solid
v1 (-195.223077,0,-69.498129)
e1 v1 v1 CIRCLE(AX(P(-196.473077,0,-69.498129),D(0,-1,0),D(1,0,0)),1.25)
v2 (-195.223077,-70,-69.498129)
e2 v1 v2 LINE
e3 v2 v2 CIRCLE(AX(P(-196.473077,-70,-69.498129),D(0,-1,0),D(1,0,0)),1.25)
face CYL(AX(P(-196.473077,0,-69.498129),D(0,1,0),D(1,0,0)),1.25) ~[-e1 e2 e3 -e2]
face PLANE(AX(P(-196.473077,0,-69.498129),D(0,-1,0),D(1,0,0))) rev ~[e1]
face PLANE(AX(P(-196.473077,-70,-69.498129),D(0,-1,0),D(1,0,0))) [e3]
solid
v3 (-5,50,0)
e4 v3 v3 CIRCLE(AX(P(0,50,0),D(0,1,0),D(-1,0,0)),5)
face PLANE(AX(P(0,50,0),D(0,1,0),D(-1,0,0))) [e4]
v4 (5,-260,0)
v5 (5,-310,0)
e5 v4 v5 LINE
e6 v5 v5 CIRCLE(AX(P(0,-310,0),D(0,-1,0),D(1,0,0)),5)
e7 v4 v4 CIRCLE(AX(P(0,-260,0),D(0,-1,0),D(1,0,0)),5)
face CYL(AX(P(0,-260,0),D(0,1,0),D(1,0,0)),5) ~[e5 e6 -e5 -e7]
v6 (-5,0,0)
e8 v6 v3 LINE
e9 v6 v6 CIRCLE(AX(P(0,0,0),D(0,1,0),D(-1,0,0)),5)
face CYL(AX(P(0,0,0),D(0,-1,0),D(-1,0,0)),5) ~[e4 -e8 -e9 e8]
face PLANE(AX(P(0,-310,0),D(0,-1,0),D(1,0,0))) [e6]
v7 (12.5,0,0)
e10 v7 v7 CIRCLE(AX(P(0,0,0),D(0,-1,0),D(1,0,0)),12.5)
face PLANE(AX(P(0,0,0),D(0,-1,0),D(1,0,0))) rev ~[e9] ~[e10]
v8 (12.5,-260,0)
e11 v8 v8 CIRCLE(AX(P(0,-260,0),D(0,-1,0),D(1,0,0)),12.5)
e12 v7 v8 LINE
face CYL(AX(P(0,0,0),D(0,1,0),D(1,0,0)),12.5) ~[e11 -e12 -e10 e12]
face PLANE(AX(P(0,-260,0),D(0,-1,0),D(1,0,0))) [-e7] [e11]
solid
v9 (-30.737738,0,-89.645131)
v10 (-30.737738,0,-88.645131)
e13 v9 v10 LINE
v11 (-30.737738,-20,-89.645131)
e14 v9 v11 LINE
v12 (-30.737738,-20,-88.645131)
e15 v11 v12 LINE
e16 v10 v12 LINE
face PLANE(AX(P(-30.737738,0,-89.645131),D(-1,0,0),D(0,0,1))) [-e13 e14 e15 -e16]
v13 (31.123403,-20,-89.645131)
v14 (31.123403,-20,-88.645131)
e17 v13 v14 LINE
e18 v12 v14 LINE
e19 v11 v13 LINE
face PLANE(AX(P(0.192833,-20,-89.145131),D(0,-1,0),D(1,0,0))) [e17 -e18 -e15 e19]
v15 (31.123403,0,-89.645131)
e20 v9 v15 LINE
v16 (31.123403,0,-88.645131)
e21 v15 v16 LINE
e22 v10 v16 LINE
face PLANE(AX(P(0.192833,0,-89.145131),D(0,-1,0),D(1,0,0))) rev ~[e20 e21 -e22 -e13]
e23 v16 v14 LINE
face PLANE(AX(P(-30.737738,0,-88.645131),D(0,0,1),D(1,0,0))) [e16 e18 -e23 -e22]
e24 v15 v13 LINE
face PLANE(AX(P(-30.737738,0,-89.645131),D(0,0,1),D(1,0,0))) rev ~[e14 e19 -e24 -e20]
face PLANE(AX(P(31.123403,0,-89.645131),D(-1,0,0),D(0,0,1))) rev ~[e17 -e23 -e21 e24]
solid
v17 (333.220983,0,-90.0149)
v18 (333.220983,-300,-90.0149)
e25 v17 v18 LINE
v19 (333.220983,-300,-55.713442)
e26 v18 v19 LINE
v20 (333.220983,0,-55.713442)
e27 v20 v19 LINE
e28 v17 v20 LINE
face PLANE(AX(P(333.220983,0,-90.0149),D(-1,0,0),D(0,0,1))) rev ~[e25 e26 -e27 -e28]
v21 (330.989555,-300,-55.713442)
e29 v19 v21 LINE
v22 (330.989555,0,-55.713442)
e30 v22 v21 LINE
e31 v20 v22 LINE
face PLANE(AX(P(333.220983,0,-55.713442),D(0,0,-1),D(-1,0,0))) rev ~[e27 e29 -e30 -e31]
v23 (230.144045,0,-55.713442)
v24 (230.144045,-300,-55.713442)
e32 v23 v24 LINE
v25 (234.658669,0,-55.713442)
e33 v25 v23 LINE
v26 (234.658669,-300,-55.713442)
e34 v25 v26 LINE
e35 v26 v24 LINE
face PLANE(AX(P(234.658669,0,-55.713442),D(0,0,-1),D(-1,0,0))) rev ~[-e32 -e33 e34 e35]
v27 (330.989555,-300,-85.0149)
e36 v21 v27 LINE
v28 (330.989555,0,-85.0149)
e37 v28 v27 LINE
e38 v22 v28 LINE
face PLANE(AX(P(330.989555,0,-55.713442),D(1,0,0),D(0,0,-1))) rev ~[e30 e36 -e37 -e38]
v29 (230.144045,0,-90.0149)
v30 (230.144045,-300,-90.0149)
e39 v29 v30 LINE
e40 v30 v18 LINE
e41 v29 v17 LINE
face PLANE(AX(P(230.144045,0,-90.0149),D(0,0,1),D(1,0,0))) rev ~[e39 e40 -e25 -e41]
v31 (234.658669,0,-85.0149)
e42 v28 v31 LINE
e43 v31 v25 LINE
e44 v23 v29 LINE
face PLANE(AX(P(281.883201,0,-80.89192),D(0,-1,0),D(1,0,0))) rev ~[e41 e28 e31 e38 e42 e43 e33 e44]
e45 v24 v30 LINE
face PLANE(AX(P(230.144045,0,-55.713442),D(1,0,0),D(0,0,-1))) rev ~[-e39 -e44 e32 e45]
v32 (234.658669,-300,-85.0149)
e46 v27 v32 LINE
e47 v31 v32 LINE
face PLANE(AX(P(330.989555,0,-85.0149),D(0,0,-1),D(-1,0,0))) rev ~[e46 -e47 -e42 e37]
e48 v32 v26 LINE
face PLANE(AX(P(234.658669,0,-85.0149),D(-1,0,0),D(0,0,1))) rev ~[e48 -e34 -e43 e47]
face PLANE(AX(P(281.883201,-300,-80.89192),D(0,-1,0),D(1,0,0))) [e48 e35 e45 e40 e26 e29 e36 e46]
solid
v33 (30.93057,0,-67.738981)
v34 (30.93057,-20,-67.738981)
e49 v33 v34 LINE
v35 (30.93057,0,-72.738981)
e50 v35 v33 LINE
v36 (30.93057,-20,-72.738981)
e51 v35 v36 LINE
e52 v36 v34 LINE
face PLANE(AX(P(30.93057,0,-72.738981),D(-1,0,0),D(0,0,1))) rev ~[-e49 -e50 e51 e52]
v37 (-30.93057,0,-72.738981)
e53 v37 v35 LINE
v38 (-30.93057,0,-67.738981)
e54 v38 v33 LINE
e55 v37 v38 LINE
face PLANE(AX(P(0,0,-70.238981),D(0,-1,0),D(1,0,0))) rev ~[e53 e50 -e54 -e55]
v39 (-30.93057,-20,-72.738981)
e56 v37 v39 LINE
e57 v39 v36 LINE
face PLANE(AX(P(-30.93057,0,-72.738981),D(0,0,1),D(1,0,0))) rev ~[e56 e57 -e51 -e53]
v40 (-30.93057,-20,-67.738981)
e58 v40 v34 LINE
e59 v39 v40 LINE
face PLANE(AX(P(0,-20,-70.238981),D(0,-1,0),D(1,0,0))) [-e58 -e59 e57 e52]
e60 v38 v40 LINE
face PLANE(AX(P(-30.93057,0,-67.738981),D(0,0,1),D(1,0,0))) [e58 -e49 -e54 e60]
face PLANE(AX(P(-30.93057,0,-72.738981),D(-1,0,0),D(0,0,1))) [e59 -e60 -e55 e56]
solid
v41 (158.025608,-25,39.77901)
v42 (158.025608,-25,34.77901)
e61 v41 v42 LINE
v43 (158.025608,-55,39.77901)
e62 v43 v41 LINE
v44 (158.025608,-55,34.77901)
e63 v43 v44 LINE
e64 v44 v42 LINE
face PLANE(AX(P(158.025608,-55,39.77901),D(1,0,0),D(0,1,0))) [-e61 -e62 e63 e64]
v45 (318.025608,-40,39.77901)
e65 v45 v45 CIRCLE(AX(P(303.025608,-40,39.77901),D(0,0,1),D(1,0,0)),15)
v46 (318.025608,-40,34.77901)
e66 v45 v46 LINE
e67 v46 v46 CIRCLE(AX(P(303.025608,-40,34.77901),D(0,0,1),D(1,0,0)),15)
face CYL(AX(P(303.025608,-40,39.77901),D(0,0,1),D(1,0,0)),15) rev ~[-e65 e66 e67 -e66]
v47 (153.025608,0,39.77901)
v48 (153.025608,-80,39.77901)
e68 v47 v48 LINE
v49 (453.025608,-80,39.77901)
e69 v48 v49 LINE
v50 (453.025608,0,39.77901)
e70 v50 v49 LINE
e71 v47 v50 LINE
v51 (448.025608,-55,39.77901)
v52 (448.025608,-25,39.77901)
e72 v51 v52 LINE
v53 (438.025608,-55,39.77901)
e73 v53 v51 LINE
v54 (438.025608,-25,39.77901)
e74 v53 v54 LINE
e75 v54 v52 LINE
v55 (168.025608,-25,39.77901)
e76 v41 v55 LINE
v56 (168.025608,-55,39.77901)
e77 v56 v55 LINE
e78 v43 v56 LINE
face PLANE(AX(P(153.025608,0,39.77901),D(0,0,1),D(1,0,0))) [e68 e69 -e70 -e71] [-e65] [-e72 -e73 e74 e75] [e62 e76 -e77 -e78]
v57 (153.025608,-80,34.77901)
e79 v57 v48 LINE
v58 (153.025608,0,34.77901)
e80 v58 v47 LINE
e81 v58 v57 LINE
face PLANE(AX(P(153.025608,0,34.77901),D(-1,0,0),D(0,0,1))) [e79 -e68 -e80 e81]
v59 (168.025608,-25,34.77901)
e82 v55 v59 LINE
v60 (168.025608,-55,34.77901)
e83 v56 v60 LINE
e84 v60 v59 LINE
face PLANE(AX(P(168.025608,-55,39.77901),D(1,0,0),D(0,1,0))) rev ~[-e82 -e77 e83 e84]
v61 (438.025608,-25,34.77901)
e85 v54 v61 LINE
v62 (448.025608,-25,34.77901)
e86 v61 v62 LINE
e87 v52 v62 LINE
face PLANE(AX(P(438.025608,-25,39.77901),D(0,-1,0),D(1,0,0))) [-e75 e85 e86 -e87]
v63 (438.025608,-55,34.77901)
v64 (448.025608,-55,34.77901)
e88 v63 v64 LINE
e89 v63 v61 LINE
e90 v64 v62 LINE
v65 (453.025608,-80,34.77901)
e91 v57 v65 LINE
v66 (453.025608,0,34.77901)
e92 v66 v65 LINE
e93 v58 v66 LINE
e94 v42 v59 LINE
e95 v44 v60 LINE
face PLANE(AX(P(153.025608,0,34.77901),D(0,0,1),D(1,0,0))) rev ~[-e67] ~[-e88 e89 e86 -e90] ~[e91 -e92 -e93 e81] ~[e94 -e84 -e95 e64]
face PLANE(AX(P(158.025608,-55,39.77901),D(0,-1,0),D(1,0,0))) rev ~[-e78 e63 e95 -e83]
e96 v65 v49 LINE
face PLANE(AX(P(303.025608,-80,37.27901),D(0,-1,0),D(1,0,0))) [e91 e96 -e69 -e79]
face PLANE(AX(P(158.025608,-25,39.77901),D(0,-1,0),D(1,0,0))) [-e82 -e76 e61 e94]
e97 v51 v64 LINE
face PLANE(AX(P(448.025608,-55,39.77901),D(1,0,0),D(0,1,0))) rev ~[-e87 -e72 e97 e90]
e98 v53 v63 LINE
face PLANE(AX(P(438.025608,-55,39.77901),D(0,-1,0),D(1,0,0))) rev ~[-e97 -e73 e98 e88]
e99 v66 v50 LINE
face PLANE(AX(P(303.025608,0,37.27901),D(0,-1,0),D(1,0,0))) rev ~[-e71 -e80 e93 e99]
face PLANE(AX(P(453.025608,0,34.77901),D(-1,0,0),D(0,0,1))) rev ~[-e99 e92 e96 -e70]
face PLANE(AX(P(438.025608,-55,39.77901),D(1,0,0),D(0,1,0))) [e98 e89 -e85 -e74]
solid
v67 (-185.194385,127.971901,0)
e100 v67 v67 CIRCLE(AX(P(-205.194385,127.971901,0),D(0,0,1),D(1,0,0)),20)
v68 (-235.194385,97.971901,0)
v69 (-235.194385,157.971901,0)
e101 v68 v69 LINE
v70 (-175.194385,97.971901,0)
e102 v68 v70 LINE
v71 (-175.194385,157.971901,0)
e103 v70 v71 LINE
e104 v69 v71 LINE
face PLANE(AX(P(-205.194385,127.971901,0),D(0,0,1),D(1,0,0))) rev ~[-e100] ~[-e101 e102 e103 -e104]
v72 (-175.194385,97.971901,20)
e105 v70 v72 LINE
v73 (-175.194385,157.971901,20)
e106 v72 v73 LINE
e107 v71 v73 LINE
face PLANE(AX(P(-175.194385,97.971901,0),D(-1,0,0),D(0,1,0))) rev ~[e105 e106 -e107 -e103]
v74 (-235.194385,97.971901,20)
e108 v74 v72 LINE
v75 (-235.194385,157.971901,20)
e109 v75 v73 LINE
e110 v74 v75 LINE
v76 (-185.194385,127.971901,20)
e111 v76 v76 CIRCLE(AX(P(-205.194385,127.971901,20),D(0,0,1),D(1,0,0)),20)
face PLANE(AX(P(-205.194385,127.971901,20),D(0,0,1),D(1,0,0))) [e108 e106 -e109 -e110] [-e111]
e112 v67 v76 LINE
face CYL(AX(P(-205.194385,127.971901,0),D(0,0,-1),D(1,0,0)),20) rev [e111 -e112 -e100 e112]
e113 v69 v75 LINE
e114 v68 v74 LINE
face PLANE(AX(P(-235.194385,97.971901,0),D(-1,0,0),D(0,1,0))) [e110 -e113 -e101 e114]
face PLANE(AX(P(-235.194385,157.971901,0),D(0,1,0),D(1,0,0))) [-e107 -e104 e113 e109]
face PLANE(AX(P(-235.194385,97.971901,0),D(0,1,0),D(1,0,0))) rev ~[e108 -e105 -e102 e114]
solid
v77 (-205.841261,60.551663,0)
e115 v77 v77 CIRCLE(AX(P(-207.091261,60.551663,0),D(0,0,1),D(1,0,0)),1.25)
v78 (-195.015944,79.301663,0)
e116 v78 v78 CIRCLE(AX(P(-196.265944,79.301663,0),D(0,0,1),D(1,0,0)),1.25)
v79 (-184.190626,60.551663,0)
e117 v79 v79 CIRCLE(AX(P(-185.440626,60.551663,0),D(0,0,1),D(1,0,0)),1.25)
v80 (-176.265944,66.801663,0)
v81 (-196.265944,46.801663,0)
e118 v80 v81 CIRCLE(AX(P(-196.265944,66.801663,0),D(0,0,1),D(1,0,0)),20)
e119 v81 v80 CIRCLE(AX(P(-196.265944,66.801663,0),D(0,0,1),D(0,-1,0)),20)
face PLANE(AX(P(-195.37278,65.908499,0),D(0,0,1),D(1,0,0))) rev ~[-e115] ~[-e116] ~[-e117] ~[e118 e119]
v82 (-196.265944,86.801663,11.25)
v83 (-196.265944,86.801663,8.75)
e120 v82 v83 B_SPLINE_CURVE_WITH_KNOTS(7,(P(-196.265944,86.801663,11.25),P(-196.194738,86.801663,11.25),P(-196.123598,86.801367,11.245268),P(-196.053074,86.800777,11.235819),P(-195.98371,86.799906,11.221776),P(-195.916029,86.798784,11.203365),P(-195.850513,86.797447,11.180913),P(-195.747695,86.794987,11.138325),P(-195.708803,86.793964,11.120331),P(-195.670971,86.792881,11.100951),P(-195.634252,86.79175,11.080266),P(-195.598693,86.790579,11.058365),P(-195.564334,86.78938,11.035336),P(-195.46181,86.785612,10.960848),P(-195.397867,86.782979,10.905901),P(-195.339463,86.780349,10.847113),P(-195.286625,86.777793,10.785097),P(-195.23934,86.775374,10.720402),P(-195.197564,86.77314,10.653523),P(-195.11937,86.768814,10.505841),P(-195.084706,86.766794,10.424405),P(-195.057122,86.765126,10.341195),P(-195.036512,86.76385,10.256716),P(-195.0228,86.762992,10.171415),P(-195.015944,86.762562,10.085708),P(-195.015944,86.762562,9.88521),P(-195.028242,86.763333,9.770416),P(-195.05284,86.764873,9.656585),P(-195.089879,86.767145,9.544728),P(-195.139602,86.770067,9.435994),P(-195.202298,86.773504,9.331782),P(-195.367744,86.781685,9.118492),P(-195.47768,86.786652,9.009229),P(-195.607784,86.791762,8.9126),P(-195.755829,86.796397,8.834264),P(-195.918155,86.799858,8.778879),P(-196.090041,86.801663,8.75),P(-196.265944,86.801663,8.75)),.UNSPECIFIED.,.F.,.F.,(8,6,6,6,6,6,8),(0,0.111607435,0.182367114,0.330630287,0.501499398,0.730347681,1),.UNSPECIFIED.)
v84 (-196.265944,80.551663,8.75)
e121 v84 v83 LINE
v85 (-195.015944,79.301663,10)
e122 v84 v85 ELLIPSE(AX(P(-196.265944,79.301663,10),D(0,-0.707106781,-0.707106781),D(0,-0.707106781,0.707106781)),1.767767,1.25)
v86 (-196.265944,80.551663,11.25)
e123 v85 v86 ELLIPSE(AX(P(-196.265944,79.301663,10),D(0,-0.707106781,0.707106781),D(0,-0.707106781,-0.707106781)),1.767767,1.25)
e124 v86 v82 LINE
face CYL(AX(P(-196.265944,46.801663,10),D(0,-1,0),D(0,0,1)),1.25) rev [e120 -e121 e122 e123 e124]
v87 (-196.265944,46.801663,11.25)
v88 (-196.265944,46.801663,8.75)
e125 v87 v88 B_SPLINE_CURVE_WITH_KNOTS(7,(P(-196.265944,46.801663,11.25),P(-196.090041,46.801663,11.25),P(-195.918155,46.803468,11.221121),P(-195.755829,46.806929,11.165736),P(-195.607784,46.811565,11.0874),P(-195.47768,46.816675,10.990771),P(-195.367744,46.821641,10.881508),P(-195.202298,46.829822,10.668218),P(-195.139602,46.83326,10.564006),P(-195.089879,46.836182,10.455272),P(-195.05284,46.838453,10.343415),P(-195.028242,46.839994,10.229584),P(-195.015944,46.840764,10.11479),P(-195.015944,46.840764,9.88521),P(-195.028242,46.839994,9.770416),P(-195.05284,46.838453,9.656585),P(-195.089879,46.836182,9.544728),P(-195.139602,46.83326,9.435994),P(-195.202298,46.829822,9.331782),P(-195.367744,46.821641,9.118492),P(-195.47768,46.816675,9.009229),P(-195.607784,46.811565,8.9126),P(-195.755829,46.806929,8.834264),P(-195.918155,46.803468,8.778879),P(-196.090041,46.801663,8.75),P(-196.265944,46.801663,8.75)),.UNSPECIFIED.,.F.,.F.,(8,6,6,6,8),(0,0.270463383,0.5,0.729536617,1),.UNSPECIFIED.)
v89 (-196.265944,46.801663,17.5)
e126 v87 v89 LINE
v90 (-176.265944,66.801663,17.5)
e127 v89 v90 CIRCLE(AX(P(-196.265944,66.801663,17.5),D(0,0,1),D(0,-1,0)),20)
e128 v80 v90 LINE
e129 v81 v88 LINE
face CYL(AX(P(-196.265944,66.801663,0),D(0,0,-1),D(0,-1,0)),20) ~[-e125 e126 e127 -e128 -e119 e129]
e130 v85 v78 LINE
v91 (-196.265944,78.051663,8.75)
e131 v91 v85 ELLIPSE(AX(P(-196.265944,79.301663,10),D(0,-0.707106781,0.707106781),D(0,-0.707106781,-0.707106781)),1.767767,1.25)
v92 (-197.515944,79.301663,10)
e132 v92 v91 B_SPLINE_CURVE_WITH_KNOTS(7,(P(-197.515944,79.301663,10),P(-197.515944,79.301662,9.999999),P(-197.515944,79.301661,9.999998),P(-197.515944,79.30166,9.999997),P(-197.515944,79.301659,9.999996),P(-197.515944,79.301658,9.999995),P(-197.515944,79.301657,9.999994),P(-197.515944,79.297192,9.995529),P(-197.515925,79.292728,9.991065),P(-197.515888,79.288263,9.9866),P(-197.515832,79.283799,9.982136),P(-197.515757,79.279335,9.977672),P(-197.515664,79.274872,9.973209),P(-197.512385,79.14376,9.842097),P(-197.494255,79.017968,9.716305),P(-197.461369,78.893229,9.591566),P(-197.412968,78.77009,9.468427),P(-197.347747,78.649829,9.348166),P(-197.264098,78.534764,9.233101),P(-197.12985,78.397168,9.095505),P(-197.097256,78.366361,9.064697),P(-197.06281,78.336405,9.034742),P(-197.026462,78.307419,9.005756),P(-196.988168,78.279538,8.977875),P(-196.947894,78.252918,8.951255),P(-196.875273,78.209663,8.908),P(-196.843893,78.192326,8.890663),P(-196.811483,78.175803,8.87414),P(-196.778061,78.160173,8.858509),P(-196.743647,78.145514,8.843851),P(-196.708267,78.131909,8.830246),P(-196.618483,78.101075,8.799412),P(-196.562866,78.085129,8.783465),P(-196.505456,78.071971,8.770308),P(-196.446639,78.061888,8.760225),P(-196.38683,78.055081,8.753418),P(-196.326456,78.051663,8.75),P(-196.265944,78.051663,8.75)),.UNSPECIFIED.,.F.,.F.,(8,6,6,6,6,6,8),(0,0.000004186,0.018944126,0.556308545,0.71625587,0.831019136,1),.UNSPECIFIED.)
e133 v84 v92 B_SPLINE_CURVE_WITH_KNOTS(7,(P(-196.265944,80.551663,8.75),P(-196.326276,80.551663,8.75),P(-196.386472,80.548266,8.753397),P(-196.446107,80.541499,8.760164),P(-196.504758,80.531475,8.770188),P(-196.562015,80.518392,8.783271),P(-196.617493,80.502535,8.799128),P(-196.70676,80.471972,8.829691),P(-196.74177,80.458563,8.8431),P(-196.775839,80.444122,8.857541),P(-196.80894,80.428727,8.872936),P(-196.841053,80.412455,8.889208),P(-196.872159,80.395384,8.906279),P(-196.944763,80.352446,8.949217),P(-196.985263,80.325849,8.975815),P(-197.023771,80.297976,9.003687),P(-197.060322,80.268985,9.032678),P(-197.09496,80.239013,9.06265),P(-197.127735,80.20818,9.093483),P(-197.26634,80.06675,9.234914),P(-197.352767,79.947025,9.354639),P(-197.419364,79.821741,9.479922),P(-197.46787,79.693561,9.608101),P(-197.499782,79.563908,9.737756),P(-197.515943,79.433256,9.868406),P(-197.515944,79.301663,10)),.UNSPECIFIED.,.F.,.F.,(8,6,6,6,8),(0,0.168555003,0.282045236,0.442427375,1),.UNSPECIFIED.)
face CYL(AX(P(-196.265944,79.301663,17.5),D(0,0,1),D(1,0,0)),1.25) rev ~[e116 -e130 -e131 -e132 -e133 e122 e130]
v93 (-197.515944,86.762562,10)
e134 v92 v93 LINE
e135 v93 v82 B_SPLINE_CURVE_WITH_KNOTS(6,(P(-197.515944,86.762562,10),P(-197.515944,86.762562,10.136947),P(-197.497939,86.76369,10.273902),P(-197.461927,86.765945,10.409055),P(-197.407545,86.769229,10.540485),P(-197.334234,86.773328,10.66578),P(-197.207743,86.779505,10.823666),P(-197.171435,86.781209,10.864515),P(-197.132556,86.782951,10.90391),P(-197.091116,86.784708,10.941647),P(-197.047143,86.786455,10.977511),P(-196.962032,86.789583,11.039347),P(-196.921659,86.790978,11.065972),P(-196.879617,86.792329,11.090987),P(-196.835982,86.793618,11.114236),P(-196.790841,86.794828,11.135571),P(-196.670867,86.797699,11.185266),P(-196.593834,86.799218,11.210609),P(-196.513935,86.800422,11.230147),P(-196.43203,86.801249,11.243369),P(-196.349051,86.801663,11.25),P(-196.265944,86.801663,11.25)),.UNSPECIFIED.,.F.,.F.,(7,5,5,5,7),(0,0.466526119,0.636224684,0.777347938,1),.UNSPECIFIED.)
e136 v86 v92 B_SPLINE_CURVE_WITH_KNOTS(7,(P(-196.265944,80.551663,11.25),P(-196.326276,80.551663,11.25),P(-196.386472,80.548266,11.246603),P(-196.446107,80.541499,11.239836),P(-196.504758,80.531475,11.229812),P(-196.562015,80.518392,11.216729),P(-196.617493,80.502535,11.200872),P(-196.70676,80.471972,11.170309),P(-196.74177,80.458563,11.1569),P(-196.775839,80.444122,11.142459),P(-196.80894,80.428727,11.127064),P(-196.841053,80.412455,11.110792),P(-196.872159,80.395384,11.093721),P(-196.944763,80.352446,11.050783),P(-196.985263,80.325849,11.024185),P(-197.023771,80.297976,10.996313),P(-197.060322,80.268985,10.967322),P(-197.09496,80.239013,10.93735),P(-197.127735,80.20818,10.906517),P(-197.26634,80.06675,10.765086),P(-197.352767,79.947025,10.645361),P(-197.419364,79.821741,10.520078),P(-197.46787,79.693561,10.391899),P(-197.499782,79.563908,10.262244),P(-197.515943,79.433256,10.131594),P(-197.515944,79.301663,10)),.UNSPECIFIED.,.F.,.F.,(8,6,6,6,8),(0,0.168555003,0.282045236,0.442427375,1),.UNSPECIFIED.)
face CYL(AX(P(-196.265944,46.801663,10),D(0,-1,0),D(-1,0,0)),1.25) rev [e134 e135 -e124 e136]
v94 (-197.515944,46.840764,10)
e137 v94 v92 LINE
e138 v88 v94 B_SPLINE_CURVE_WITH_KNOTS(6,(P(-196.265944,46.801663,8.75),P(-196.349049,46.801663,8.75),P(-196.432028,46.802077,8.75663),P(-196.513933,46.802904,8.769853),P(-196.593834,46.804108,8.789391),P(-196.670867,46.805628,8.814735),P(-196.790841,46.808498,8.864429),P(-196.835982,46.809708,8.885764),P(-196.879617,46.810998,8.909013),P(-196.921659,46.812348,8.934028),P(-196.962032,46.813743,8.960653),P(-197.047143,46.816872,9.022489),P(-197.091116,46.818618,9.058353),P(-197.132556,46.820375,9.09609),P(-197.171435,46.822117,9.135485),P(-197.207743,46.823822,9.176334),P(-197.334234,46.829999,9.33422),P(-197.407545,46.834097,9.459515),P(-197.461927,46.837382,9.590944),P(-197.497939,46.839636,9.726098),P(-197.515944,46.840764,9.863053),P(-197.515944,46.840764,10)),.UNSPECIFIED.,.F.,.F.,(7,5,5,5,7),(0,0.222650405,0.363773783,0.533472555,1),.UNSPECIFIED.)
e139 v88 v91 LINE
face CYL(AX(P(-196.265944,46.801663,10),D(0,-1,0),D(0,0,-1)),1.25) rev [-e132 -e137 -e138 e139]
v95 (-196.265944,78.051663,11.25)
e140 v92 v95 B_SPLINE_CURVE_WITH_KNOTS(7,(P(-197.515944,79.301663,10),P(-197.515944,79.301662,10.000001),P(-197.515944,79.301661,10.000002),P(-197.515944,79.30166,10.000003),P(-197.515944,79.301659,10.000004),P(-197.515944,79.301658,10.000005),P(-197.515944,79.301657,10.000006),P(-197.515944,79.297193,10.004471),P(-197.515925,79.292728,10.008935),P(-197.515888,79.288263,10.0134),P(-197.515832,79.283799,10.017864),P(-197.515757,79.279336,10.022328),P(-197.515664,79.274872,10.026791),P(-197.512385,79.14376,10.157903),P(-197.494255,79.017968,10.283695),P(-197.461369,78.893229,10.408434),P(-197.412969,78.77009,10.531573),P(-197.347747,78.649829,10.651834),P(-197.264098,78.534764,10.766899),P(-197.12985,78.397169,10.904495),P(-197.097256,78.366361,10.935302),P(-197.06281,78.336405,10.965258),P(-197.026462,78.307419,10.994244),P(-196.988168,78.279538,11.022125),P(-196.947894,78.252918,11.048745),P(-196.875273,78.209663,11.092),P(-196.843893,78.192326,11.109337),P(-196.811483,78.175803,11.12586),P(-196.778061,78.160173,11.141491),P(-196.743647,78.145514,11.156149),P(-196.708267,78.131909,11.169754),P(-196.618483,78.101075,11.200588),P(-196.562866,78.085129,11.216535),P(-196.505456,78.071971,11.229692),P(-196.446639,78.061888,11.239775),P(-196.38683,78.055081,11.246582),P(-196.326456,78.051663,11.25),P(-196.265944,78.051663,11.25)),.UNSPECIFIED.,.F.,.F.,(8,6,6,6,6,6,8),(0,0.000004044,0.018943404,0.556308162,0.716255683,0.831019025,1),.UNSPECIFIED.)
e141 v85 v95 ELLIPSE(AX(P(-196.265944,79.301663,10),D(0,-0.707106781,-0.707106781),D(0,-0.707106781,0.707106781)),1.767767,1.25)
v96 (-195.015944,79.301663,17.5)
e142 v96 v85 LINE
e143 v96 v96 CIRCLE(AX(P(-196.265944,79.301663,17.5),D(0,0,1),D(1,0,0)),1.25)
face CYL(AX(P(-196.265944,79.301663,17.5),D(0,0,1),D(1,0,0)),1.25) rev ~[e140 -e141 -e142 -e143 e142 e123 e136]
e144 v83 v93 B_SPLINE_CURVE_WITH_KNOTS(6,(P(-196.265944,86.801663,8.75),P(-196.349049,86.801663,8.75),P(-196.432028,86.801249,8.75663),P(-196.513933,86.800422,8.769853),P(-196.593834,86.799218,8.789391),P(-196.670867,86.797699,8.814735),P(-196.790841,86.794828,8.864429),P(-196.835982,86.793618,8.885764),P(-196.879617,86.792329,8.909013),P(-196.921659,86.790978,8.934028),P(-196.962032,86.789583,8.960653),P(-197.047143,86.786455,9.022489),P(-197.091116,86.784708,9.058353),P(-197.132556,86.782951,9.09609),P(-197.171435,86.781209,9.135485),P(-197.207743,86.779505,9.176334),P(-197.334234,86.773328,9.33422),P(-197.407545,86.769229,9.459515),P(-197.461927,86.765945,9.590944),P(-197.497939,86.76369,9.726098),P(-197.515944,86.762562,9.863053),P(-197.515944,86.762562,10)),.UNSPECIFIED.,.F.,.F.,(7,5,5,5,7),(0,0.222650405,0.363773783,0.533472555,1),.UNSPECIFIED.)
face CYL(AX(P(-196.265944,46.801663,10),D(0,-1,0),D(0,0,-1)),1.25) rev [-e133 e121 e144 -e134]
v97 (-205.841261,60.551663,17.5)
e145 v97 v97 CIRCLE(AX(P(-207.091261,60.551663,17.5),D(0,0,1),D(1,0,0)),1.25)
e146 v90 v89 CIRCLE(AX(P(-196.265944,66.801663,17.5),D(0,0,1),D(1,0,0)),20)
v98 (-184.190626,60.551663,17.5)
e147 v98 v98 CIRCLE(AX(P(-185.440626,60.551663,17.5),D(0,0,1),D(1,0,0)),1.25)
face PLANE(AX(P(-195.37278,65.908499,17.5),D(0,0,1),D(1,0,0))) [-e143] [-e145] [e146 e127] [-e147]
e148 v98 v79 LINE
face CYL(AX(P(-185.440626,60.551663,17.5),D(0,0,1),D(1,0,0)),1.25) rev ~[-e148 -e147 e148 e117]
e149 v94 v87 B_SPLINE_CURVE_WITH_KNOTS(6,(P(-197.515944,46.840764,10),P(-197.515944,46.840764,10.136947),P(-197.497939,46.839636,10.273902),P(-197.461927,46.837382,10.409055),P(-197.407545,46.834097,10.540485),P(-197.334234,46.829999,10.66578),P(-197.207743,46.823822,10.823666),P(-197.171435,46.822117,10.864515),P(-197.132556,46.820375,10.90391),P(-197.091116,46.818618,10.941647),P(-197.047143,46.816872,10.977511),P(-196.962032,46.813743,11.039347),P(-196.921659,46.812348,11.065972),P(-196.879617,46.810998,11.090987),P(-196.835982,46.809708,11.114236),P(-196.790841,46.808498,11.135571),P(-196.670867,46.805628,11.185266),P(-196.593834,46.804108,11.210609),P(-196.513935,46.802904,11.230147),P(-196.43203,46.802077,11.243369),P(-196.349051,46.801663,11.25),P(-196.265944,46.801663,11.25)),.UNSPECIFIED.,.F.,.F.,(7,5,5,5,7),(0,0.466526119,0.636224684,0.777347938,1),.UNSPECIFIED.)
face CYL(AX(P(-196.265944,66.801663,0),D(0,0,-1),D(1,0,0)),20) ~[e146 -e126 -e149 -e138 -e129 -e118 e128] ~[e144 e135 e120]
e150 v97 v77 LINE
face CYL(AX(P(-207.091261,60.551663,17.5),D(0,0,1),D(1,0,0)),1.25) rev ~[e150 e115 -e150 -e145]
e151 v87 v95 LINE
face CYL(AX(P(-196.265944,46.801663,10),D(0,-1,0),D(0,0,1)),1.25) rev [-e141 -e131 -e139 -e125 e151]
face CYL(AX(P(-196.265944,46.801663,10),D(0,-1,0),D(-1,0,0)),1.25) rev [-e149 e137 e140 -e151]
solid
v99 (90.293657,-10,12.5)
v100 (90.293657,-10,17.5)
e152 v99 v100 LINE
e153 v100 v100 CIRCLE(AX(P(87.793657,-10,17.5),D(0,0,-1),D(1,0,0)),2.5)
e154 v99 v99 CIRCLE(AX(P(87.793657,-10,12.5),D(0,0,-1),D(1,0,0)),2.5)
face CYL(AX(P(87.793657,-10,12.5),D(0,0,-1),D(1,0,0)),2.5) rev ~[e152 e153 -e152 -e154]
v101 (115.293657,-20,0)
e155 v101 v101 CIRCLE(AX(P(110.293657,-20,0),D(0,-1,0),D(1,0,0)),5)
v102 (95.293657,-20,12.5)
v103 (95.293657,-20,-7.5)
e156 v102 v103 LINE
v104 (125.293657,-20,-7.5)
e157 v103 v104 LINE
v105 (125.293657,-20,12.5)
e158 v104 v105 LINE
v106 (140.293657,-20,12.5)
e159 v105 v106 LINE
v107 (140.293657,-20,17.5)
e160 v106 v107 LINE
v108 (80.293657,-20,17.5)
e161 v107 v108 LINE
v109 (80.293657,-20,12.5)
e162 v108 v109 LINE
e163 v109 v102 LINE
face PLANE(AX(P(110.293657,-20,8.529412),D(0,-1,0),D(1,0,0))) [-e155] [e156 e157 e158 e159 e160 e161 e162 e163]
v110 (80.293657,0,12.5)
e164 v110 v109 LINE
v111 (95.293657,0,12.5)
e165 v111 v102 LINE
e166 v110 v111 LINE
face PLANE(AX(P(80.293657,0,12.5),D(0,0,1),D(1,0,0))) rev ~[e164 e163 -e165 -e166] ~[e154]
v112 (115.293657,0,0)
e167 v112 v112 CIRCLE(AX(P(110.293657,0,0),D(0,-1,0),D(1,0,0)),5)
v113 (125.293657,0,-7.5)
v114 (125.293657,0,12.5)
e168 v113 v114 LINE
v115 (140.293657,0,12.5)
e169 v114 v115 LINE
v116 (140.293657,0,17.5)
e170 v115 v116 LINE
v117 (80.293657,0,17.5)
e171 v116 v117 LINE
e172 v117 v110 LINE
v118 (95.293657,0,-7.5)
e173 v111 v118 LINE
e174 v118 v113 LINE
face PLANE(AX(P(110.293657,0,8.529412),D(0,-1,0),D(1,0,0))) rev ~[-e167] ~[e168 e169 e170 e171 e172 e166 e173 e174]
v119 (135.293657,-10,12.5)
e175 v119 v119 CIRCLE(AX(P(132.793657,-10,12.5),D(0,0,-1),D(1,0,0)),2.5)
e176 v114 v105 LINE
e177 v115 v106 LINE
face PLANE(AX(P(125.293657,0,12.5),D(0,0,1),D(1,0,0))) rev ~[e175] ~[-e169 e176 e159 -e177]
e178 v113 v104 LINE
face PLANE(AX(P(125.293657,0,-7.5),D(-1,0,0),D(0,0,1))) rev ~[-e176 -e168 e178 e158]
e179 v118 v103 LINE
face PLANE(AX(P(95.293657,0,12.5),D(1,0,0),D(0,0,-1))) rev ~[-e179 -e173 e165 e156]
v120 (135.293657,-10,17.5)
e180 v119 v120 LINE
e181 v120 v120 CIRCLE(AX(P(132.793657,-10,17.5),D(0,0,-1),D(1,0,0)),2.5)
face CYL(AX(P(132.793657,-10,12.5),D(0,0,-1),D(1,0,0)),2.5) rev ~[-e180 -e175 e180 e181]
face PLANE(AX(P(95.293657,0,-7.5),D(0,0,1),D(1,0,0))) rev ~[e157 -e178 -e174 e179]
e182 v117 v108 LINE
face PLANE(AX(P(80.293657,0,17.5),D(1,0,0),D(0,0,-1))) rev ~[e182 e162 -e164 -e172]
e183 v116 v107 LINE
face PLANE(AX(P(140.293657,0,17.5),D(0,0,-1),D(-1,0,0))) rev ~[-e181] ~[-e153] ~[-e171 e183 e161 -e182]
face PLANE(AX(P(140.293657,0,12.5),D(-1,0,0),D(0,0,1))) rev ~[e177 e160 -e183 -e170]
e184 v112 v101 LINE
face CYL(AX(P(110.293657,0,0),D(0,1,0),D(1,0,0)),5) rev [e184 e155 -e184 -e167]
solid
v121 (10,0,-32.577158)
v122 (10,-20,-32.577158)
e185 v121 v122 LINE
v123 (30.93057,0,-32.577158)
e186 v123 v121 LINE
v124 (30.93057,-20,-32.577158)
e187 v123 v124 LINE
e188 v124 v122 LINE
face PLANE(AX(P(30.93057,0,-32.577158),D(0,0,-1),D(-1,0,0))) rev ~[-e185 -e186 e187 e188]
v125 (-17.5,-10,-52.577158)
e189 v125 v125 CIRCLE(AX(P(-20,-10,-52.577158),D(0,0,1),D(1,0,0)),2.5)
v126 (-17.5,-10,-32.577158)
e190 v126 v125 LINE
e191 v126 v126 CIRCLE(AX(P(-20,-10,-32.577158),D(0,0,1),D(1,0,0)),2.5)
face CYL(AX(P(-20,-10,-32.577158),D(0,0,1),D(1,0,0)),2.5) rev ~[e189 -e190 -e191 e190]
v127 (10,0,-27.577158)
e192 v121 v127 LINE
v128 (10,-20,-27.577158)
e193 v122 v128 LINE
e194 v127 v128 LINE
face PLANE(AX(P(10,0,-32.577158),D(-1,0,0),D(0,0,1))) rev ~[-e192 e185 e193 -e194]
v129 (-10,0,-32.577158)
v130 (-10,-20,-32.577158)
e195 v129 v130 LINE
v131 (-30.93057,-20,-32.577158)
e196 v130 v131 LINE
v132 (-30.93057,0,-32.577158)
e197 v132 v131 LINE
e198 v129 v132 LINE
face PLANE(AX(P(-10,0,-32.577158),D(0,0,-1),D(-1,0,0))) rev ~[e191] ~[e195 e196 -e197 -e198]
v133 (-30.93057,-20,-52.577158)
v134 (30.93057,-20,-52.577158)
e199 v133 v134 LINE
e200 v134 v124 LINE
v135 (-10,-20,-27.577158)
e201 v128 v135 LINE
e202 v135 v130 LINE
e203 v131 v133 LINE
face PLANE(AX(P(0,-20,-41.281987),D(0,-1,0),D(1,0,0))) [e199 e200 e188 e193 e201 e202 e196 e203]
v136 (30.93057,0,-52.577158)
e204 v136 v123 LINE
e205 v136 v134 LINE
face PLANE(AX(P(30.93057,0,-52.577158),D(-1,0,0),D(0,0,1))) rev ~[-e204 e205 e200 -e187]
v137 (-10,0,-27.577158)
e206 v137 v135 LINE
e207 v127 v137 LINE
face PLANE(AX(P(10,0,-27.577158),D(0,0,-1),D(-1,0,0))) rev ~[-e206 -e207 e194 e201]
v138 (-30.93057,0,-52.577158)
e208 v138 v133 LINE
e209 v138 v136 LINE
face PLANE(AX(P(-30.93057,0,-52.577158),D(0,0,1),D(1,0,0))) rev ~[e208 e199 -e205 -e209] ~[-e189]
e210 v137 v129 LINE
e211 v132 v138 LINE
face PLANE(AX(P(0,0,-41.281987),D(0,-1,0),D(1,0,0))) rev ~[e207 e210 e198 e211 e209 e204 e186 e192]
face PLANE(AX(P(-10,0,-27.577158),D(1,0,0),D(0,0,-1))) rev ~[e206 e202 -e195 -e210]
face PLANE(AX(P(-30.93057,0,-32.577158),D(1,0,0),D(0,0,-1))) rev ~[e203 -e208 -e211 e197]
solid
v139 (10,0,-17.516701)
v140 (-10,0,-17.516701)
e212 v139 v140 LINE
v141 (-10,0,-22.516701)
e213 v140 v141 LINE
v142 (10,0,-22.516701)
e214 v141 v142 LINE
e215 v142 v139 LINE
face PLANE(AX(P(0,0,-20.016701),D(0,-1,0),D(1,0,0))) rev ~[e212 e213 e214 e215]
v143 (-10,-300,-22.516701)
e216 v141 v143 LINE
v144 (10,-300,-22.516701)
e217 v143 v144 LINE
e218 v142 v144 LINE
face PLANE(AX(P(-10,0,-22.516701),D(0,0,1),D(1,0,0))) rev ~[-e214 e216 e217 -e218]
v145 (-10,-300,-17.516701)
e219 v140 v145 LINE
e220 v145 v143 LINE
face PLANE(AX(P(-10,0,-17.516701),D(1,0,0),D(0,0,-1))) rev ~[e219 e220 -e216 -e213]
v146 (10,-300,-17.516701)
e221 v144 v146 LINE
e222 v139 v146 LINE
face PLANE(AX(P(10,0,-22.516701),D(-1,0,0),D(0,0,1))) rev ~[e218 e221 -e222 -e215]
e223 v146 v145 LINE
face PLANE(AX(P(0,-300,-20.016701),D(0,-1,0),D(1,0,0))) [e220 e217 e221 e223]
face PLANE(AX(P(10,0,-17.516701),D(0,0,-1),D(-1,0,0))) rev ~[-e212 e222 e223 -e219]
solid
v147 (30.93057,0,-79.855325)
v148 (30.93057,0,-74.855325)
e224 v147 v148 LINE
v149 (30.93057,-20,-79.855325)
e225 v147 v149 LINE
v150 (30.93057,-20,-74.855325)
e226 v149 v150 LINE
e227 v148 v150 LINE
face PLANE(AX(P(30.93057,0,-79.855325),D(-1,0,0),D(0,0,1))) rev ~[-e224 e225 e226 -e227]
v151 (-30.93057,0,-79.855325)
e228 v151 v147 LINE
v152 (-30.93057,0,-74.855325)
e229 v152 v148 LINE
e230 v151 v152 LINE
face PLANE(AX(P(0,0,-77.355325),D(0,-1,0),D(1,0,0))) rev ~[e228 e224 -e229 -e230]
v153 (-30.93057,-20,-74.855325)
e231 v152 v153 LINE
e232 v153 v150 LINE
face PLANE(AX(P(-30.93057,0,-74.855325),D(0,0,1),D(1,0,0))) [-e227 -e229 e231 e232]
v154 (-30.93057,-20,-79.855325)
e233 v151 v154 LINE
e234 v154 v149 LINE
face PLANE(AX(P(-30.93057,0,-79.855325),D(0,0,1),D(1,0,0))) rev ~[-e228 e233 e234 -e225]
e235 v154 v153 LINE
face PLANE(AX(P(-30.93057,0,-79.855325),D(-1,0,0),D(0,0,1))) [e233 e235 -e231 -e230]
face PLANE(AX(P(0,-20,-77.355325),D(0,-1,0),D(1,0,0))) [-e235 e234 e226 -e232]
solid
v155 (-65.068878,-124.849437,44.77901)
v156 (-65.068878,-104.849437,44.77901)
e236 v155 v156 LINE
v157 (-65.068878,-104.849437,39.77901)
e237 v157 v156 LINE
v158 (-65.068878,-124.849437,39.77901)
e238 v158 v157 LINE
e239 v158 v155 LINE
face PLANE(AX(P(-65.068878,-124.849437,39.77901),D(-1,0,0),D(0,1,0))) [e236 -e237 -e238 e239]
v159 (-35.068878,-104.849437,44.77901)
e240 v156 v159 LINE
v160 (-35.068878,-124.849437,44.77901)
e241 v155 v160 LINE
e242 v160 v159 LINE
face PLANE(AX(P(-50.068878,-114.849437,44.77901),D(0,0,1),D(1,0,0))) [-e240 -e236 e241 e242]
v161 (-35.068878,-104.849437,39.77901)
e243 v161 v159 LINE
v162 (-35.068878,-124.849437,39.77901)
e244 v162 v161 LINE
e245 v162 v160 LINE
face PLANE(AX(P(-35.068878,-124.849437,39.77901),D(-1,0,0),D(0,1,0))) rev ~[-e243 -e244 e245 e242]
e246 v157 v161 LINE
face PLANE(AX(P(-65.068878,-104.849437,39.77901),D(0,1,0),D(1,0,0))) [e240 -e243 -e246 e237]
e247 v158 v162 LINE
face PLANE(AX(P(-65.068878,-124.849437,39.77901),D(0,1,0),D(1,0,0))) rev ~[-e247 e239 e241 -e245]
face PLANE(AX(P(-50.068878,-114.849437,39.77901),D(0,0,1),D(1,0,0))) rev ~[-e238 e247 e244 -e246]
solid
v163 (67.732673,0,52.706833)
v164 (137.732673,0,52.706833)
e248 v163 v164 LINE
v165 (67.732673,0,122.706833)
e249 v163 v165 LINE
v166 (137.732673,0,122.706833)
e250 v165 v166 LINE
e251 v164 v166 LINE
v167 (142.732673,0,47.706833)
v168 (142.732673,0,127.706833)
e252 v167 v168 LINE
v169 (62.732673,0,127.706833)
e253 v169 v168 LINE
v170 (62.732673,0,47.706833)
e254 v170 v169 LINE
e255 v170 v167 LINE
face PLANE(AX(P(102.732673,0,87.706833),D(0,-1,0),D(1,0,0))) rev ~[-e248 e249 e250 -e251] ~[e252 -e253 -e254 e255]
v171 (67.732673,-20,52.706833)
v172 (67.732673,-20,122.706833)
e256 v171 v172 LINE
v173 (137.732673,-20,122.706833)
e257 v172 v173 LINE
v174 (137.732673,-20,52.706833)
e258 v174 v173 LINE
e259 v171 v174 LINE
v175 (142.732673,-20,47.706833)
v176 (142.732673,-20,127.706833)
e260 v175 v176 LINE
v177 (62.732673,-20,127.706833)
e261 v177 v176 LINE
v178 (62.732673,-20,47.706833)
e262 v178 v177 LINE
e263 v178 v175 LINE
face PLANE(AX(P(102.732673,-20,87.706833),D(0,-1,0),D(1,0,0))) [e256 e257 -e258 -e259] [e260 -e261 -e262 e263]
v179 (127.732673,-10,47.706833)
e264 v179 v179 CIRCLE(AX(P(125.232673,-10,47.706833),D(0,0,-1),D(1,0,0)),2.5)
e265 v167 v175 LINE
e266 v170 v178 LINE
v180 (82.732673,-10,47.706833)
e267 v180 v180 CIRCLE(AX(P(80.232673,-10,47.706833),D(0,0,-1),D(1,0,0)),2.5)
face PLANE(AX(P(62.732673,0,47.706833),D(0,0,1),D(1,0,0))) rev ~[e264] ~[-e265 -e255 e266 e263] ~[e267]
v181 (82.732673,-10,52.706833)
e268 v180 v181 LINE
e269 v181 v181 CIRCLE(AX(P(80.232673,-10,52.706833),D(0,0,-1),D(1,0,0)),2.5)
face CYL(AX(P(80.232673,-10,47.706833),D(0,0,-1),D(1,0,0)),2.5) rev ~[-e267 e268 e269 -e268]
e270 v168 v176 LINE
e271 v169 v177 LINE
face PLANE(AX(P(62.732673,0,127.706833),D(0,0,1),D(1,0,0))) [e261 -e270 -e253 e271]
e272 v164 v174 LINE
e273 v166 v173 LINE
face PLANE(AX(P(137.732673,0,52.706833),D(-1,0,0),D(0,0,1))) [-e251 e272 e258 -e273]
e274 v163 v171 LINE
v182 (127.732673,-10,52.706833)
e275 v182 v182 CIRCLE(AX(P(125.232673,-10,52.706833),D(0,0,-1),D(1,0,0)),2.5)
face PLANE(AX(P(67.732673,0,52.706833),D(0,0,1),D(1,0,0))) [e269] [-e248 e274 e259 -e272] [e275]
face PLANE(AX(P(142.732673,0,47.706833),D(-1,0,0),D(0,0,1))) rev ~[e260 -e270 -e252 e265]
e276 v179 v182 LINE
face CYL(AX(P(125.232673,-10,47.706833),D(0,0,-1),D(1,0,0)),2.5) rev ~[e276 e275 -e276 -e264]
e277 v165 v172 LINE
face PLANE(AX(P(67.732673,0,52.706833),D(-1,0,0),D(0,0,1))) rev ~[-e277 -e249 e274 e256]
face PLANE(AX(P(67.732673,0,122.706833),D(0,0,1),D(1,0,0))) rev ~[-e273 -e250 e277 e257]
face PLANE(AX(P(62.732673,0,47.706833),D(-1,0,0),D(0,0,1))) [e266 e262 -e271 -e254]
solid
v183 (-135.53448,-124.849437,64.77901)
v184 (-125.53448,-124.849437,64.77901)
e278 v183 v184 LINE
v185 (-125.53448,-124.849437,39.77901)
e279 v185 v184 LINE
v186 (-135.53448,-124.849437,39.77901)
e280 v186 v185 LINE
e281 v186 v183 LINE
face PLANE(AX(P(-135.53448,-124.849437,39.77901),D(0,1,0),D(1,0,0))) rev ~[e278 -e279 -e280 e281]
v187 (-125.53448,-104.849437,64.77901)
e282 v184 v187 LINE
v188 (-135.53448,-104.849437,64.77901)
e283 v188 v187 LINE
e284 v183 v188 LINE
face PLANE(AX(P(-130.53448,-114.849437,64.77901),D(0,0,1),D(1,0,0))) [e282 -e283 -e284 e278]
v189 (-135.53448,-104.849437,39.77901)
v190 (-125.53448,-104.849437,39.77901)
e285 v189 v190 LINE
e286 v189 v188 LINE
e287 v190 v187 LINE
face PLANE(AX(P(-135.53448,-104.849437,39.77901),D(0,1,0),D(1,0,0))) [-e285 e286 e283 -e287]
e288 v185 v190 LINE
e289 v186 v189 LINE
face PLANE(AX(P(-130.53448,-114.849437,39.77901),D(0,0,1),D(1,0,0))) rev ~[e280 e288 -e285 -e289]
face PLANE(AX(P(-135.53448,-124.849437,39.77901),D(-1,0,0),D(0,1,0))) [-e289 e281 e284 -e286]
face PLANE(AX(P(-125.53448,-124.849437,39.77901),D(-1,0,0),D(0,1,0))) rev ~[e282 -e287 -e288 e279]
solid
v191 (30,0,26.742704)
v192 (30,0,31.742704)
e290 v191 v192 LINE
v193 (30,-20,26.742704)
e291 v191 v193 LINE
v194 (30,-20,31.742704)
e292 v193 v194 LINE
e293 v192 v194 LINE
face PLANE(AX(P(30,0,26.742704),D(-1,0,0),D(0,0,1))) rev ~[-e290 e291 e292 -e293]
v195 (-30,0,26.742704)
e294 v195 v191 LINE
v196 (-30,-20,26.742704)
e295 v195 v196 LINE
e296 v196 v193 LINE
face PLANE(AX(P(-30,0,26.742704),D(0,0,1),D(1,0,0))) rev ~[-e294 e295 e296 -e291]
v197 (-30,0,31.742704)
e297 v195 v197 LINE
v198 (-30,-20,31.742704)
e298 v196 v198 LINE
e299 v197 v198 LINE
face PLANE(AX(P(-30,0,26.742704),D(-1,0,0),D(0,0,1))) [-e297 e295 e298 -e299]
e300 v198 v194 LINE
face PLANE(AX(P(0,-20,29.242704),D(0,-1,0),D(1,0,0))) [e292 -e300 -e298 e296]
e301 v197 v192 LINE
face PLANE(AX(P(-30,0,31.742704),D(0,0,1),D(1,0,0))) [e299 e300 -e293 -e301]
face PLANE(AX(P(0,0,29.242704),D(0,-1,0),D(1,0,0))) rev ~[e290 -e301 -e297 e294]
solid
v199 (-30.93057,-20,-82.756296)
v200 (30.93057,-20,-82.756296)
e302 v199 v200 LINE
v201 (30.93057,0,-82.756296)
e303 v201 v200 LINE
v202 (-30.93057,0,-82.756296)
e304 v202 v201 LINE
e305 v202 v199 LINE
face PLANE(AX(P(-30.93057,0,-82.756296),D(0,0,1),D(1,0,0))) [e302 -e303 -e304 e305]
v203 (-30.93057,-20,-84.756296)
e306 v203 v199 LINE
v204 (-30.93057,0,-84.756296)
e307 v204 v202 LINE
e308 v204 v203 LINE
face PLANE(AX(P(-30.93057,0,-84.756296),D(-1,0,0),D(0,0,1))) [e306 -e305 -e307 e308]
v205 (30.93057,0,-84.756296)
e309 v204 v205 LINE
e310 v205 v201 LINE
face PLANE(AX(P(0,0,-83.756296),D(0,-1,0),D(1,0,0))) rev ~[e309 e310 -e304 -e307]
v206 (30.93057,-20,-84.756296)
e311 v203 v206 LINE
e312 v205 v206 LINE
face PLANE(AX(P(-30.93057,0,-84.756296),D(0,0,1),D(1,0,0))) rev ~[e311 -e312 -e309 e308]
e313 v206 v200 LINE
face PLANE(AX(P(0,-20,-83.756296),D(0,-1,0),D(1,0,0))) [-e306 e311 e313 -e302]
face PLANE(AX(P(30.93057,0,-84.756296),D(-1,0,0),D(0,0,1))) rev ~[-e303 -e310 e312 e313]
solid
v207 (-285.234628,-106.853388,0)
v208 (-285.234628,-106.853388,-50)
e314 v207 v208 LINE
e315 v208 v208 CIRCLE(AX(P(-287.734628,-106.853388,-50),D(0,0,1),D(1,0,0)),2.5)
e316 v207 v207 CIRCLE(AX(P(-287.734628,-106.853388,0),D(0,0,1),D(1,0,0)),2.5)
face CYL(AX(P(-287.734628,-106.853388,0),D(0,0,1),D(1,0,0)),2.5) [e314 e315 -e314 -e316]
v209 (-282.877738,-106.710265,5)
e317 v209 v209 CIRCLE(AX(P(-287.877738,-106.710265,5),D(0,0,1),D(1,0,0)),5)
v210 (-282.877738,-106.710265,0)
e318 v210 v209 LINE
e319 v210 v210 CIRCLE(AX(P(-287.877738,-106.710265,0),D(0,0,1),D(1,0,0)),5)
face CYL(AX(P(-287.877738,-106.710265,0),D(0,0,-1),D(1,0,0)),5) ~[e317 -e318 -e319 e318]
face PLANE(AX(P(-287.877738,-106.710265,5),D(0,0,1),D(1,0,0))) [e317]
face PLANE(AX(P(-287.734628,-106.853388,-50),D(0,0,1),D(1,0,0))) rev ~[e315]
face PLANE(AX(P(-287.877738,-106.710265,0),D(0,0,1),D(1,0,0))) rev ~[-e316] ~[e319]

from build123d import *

# Parameters (mm, degrees)
F0_R      = 5
F1_DEPTH  = 20
F0_W      = 60
F0_H      = 5
F0_W_2    = 80
F0_H_2    = 80
F0_W_3    = 70
F0_H_3    = 70
F0_W_4    = 61.861140081
F0_H_4    = 1
F0_H_5    = 2
F0_R_2    = 12.5
F2_DEPTH  = 260
F3_R      = 5
F4_DEPTH  = 50
F5_DEPTH  = 300
F6_R      = 2.5
F7_DEPTH  = 25
F9_R      = 2.5
F8_R      = 2.5
F10_DEPTH = 25
F14_R     = 5
F15_DEPTH = 50
F16_W     = 300
F16_H     = 5
F17_DEPTH = 80
F20_DEPTH = 17.5
F19_W     = 60
F19_H     = 60
F19_R     = 20
F21_DEPTH = 20
F18_W     = 10
F18_H     = 30
F18_R     = 15
F22_DEPTH = 129.4251411048
F18_H_2   = 20
F23_DEPTH = 25
F18_W_2   = 30
F24_DEPTH = 5
F13_R     = 2.5
F25_DEPTH = 5
F26_R     = 5
F27_DEPTH = 5
F28_R     = 2.5
F29_DEPTH = 50
F32_DEPTH = 111.1712381574
F33_R     = 1.25
F34_DEPTH = 70
F35_R     = 1.25
F36_DEPTH = 107.1461310813
F38_DEPTH = 300


# Not quite as in the source:
# - a feature of the source that left no trace in its solid (it failed there, or was rolled back) is left out
# - a feature names something its author has since deleted; it is built from what else it names


with BuildPart() as f1:
    # F0 (on Front) → F1 (new body)
    with BuildSketch(Plane.XZ):
        Polygon((95.2936565876, -7.5), (110.2936565876, -7.5), (125.2936565876, -7.5), (125.2936565876, 12.5), (140.2936565876, 12.5), (140.2936565876, 17.5), (110.2936565876, 17.5), (80.2936565876, 17.5), (80.2936565876, 12.5), (95.2936565876, 12.5), align=None)
        with Locations((110.2936565876, 0)):
            Circle(F0_R, mode=Mode.SUBTRACT)
    extrude(amount=F1_DEPTH)

    # F9 (on face) + F8 (on face) → F10 (cut)
    with BuildSketch(Plane(origin=(0, 0, 12.5), x_dir=(1, 0, 0), z_dir=(0, 0, -1))):
        with Locations((87.7936565876, 10)):
            Circle(F9_R)
    with BuildSketch(Plane(origin=(0, 0, 12.5), x_dir=(1, 0, 0), z_dir=(0, 0, -1))):
        with Locations((132.7936565876, 10)):
            Circle(F8_R)
    extrude(amount=-F10_DEPTH, mode=Mode.SUBTRACT)


with BuildPart() as f1b:
    # F0 (on Front) → F1, piece 2 (new body)
    with BuildSketch(Plane.XZ):
        with Locations((0, 29.2427036911)):
            Rectangle(F0_W, F0_H)
    extrude(amount=F1_DEPTH)


with BuildPart() as f1c:
    # F0 (on Front) → F1, piece 3 (new body)
    with BuildSketch(Plane.XZ):
        Polygon((10, -27.5771580637), (0, -27.5771580637), (-10, -27.5771580637), (-10, -32.5771580637), (-10.9305700405, -32.5771580637), (-30.9305700405, -32.5771580637), (-30.9305700405, -52.5771580637), (0, -52.5771580637), (30.9305700405, -52.5771580637), (30.9305700405, -32.5771580637), (10.9305700405, -32.5771580637), (10, -32.5771580637), align=None)
    extrude(amount=F1_DEPTH)

    # F6 (on face) → F7 (cut)
    with BuildSketch(Plane.XY.offset(-32.5771580637)):
        with Locations((-20, -10)):
            Circle(F6_R)
    extrude(amount=-F7_DEPTH, mode=Mode.SUBTRACT)


with BuildPart() as f1d:
    # F0 (on Front) → F1, piece 4 (new body)
    with BuildSketch(Plane.XZ):
        with Locations((102.7326732874, 87.7068325877)):
            Rectangle(F0_W_2, F0_H_2)
        with Locations((102.7326732874, 87.7068325877)):
            Rectangle(F0_W_3, F0_H_3, mode=Mode.SUBTRACT)
    extrude(amount=F1_DEPTH)

    # F13 (on face) → F25 (cut, through all)
    with BuildSketch(Plane(origin=(0, 0, 47.7068325877), x_dir=(1, 0, 0), z_dir=(0, 0, -1))):
        with Locations((125.2326732874, 10)):
            Circle(F13_R)
        with Locations((80.2326732874, 10)):
            Circle(F13_R)
    extrude(amount=-F25_DEPTH, mode=Mode.SUBTRACT)


with BuildPart() as f1e:
    # F0 (on Front) → F1, piece 5 (new body)
    with BuildSketch(Plane.XZ):
        with Locations((0, -77.355325222)):
            Rectangle(F0_W_4, F0_H)
    extrude(amount=F1_DEPTH)


with BuildPart() as f1f:
    # F0 (on Front) → F1, piece 6 (new body)
    with BuildSketch(Plane.XZ):
        with Locations((0.1928325291, -89.1451310813)):
            Rectangle(F0_W_4, F0_H_4)
    extrude(amount=F1_DEPTH)


with BuildPart() as f1g:
    # F0 (on Front) → F1, piece 7 (new body)
    with BuildSketch(Plane.XZ):
        with Locations((0, -83.756296128)):
            Rectangle(F0_W_4, F0_H_5)
    extrude(amount=F1_DEPTH)


with BuildPart() as f1h:
    # F0 (on Front) → F1, piece 8 (new body)
    with BuildSketch(Plane.XZ):
        with Locations((0, -70.2389810979)):
            Rectangle(F0_W_4, F0_H)
    extrude(amount=F1_DEPTH)


with BuildPart() as f2:
    # F0 (on Front) → F2 (new body)
    with BuildSketch(Plane.XZ):
        Circle(F0_R_2)
    extrude(amount=F2_DEPTH)

    # F3 (on face) → F4 (join)
    with BuildSketch(Plane.XZ.offset(260)):
        Circle(F3_R)
    extrude(amount=F4_DEPTH)

    # F14 (on face) → F15 (join)
    with BuildSketch(Plane(origin=(0, 0, 0), x_dir=(-1, 0, 0), z_dir=(0, 1, 0))):
        Circle(F14_R)
    extrude(amount=F15_DEPTH)


with BuildPart() as f5:
    # F0 (on Front) → F5 (new body)
    with BuildSketch(Plane.XZ):
        Polygon((-10, -22.5167013705), (0, -22.5167013705), (10, -22.5167013705), (10, -17.5167013705), (0, -17.5167013705), (-10, -17.5167013705), align=None)
    extrude(amount=F5_DEPTH)


with BuildPart() as f17:
    # F16 (on Front) → F17 (new body)
    with BuildSketch(Plane.XZ):
        with Locations((303.0256081372, 37.2790100235)):
            Rectangle(F16_W, F16_H)
    extrude(amount=F17_DEPTH)

    # F18 (on face) → F22 (cut, through all)
    with BuildSketch(Plane.XY.offset(39.7790100235)):
        with Locations((163.0256081372, -40)):
            Rectangle(F18_W, F18_H)
        with Locations((443.0256081372, -40)):
            Rectangle(F18_W, F18_H)
        with Locations((303.0256081372, -40)):
            Circle(F18_R)
    extrude(amount=-F22_DEPTH, mode=Mode.SUBTRACT)


with BuildPart() as f20:
    # F19 (on Top) → F20 (new body)
    with BuildSketch(Plane.XY):
        with BuildLine():
            ThreePointArc((-196.265943614, 46.8016631402), (-182.1238079903, 52.6595275165), (-176.265943614, 66.8016631402))
            ThreePointArc((-176.265943614, 66.8016631402), (-210.4080792377, 80.9437987639), (-196.265943614, 46.8016631402))
        make_face()
    extrude(amount=F20_DEPTH)

    # F31 (on face) → F32 (cut, through all)
    with BuildSketch(Plane(origin=(0, 46.8016631402, 0), x_dir=(-1, 0, 0), z_dir=(0, 1, 0))):
        with BuildLine():
            Line((196.265943614, 8.75), (196.265943614, 11.25))
            ThreePointArc((196.265943614, 11.25), (195.015943614, 10), (196.265943614, 8.75))
        make_face()
        with BuildLine():
            ThreePointArc((196.265943614, 8.75), (197.1498270905, 9.1161165235), (197.515943614, 10))
            ThreePointArc((197.515943614, 10), (197.1498270905, 10.8838834765), (196.265943614, 11.25))
            Line((196.265943614, 11.25), (196.265943614, 8.75))
        make_face()
    extrude(amount=F32_DEPTH, mode=Mode.SUBTRACT)

    # F35 (on face) → F36 (cut, through all)
    with BuildSketch(Plane.XY.offset(17.5)):
        with Locations((-196.265943614, 79.3016631402)):
            Circle(F35_R)
        with Locations((-185.4406260667, 60.5516631402)):
            Circle(F35_R)
        with Locations((-207.0912611613, 60.5516631402)):
            Circle(F35_R)
    extrude(amount=-F36_DEPTH, mode=Mode.SUBTRACT)


with BuildPart() as f21:
    # F19 (on Top) → F21 (new body)
    with BuildSketch(Plane.XY):
        with Locations((-205.1943850517, 127.9719012976)):
            Rectangle(F19_W, F19_H)
        with Locations((-205.1943850517, 127.9719012976)):
            Circle(F19_R, mode=Mode.SUBTRACT)
    extrude(amount=F21_DEPTH)


with BuildPart() as f23:
    # F18 (on face) → F23 (new body)
    with BuildSketch(Plane.XY.offset(39.7790100235)):
        with Locations((-130.5344802141, -114.8494374752)):
            Rectangle(F18_W, F18_H_2)
    extrude(amount=F23_DEPTH)


with BuildPart() as f24:
    # F18 (on face) → F24 (new body)
    with BuildSketch(Plane.XY.offset(39.7790100235)):
        with Locations((-50.0688782334, -114.8494374752)):
            Rectangle(F18_W_2, F18_H_2)
    extrude(amount=F24_DEPTH)


with BuildPart() as f27:
    # F26 (on Top) → F27 (new body)
    with BuildSketch(Plane.XY):
        with Locations((-287.8777384163, -106.7102653366)):
            Circle(F26_R)
    extrude(amount=F27_DEPTH)

    # F28 (on face) → F29 (join)
    with BuildSketch(Plane.XY):
        with Locations((-287.7346277237, -106.8533882499)):
            Circle(F28_R)
    extrude(amount=-F29_DEPTH)


with BuildPart() as f34:
    # F33 (on Front) → F34 (new body)
    with BuildSketch(Plane.XZ):
        with Locations((-196.4730769396, -69.498129189)):
            Circle(F33_R)
    extrude(amount=F34_DEPTH)


with BuildPart() as f38:
    # F37 (on Front) → F38 (new body)
    with BuildSketch(Plane.XZ):
        Polygon((330.9895550274, -85.0149002401), (234.6586690965, -85.0149002401), (234.6586690965, -55.713441995), (230.1440447826, -55.713441995), (230.1440447826, -85.0149002401), (230.1440447826, -90.0149002401), (333.2209825259, -90.0149002401), (333.2209825259, -85.0149002401), (333.2209825259, -55.713441995), (330.9895550274, -55.713441995), align=None)
    extrude(amount=F38_DEPTH)


solid = Compound([f1.part, f1b.part, f1c.part, f1d.part, f1e.part, f1f.part, f1g.part, f1h.part, f2.part, f5.part, f17.part, f20.part, f21.part, f23.part, f24.part, f27.part, f34.part, f38.part])
